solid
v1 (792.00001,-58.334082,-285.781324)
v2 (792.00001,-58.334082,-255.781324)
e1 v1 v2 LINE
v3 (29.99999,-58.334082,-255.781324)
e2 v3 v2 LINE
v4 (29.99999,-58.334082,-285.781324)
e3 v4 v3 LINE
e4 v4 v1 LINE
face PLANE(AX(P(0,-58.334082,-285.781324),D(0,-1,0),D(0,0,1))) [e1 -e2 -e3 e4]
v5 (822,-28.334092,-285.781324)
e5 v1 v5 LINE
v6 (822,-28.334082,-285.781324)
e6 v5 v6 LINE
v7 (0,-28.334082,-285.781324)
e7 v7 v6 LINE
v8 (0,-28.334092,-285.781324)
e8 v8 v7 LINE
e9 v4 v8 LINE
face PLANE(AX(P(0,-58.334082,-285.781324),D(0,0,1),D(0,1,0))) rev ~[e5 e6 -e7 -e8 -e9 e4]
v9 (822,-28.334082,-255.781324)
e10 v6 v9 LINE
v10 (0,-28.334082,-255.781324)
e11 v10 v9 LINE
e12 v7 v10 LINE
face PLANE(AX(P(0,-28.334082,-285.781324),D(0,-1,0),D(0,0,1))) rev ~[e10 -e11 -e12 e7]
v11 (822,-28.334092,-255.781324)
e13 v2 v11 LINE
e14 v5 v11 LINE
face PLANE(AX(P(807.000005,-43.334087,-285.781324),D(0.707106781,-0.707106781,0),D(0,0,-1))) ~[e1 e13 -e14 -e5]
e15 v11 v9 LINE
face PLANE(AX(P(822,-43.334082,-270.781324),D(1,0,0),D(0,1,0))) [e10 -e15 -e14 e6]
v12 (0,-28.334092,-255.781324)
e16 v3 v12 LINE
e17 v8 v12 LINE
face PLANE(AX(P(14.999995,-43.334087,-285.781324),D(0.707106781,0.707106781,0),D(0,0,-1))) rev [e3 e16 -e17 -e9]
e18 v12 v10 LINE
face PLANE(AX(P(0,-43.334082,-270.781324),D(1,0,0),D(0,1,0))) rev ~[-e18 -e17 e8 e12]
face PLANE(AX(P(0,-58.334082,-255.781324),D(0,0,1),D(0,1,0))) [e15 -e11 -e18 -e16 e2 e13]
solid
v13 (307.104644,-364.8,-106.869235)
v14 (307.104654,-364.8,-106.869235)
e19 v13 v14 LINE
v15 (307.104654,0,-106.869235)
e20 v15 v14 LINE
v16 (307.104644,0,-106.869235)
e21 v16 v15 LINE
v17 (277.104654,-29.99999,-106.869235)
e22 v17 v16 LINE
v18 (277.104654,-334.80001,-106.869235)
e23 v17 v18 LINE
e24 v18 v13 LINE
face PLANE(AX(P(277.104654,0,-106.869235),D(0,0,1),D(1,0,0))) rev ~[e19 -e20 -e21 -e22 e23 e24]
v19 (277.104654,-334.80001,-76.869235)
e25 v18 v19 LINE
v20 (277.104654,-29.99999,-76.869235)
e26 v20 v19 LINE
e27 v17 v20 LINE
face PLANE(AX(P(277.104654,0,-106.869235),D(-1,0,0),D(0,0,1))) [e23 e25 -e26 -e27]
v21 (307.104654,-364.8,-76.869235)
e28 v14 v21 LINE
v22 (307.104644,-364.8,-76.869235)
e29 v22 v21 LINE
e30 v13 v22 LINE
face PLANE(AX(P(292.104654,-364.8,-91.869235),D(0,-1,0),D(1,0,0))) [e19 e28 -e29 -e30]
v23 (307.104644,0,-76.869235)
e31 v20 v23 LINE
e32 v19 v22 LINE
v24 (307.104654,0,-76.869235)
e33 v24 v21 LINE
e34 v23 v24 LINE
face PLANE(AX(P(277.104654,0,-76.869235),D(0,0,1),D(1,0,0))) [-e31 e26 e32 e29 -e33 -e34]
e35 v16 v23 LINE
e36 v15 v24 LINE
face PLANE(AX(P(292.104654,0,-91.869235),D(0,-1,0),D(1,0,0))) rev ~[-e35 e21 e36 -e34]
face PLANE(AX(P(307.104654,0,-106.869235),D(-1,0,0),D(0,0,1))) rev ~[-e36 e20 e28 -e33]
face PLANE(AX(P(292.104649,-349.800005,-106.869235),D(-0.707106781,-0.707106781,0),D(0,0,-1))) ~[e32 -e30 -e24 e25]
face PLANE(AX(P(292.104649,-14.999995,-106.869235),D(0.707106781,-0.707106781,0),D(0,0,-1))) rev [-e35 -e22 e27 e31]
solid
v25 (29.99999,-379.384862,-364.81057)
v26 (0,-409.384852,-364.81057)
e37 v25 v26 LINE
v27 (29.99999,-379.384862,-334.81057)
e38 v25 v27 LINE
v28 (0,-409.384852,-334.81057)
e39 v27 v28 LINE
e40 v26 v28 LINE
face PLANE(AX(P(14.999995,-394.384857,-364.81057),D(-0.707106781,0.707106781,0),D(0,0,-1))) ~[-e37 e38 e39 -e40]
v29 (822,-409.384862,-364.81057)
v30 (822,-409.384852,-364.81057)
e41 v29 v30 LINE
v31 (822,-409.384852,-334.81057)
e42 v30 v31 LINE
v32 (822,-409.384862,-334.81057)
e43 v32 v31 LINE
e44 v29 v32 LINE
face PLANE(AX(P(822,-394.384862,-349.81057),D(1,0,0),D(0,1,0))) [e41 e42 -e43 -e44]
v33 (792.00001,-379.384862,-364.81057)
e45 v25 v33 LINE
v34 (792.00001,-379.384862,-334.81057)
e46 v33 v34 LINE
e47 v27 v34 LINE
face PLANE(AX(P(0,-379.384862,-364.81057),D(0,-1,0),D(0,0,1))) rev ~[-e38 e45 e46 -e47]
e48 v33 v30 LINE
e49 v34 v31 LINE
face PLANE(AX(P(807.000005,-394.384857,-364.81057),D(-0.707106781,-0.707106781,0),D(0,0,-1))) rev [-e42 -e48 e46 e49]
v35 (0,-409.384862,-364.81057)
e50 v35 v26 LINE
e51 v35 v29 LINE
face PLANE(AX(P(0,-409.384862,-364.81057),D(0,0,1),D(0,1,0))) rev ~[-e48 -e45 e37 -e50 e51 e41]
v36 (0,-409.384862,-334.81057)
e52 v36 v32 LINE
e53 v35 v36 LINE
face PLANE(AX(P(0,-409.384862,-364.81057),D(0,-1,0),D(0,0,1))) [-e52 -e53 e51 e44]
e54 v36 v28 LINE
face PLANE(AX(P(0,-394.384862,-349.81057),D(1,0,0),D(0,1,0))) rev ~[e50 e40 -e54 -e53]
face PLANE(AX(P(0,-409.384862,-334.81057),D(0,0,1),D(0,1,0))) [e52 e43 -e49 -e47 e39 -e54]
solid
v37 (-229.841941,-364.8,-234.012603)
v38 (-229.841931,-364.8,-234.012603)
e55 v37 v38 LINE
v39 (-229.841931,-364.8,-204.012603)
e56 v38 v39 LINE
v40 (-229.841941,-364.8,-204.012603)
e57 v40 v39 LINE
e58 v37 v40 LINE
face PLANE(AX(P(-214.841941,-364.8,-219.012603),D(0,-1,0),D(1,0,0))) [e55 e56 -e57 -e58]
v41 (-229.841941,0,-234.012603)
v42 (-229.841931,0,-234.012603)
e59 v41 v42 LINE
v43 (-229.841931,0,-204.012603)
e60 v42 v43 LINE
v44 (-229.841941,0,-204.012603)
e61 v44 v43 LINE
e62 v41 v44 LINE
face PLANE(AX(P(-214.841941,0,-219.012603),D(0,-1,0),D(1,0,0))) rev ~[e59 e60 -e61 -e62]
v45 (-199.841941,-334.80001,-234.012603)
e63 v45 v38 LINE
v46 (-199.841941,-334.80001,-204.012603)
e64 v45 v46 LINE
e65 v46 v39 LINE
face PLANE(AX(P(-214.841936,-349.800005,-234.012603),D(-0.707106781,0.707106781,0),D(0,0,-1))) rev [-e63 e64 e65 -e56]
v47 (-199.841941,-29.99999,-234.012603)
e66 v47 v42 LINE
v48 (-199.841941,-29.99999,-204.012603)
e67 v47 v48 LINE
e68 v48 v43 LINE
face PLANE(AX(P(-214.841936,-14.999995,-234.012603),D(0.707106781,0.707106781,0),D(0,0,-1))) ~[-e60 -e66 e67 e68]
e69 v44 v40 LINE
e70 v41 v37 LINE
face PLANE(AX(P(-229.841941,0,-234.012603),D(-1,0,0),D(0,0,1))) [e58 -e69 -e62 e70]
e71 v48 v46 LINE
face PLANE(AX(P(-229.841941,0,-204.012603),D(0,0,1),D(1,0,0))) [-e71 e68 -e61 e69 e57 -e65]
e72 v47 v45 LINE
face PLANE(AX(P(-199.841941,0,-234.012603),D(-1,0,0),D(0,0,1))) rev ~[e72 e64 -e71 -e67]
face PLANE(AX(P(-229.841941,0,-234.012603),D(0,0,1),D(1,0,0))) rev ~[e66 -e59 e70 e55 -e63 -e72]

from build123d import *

# Parameters (mm, degrees)
F0_W      = 30
F0_H      = 30
F1_DEPTH  = 822
F2_W      = 30
F2_H      = 30
F3_DEPTH  = 364.8
F4_W      = 30
F4_H      = 30
F5_DEPTH  = 822
F6_W      = 30
F6_H      = 30
F7_DEPTH  = 364.8
F8_SIZE   = 29.99999
F8_2_SIZE = 29.99999
F8_3_SIZE = 29.99999
F8_4_SIZE = 29.99999


# Not quite as in the source:
# - a fillet or chamfer is up to 0.001 mm smaller than in the source, because OpenCascade refuses the exact size


with BuildPart() as f1:
    # F0 (on Right) → F1 (new body)
    with BuildSketch(Plane.YZ):
        with Locations((-43.334082365, -270.7813239098)):
            Rectangle(F0_W, F0_H)
    extrude(amount=F1_DEPTH)

    # F8#4 (size 30 in the source; OpenCascade refuses exactly that, so slightly less here)
    f8_4_edges = [f1.edges().sort_by_distance(p)[0] for p in [
        (822, -58.334082, -270.781324),
        (0, -58.334082, -270.781324),
    ]]
    chamfer(f8_4_edges, length=F8_4_SIZE)


with BuildPart() as f3:
    # F2 (on Front) → F3 (new body)
    with BuildSketch(Plane.XZ):
        with Locations((-214.8419408661, -219.0126031637)):
            Rectangle(F2_W, F2_H)
    extrude(amount=F3_DEPTH)

    # F8#2 (size 30 in the source; OpenCascade refuses exactly that, so slightly less here)
    f8_2_edges = [f3.edges().sort_by_distance(p)[0] for p in [
        (-199.841941, 0, -219.012603),
        (-199.841941, -364.8, -219.012603),
    ]]
    chamfer(f8_2_edges, length=F8_2_SIZE)


with BuildPart() as f5:
    # F4 (on Right) → F5 (new body)
    with BuildSketch(Plane.YZ):
        with Locations((-394.3848624069, -349.8105704784)):
            Rectangle(F4_W, F4_H)
    extrude(amount=F5_DEPTH)

    # F8#3 (size 30 in the source; OpenCascade refuses exactly that, so slightly less here)
    f8_3_edges = [f5.edges().sort_by_distance(p)[0] for p in [
        (0, -379.384862, -349.81057),
        (822, -379.384862, -349.81057),
    ]]
    chamfer(f8_3_edges, length=F8_3_SIZE)


with BuildPart() as f7:
    # F6 (on Front) → F7 (new body)
    with BuildSketch(Plane.XZ):
        with Locations((292.1046539125, -91.8692350388)):
            Rectangle(F6_W, F6_H)
    extrude(amount=F7_DEPTH)

    # F8 (size 30 in the source; OpenCascade refuses exactly that, so slightly less here)
    f8_edges = [f7.edges().sort_by_distance(p)[0] for p in [
        (277.104654, 0, -91.869235),
        (277.104654, -364.8, -91.869235),
    ]]
    chamfer(f8_edges, length=F8_SIZE)


solid = Compound([f1.part, f3.part, f5.part, f7.part])
